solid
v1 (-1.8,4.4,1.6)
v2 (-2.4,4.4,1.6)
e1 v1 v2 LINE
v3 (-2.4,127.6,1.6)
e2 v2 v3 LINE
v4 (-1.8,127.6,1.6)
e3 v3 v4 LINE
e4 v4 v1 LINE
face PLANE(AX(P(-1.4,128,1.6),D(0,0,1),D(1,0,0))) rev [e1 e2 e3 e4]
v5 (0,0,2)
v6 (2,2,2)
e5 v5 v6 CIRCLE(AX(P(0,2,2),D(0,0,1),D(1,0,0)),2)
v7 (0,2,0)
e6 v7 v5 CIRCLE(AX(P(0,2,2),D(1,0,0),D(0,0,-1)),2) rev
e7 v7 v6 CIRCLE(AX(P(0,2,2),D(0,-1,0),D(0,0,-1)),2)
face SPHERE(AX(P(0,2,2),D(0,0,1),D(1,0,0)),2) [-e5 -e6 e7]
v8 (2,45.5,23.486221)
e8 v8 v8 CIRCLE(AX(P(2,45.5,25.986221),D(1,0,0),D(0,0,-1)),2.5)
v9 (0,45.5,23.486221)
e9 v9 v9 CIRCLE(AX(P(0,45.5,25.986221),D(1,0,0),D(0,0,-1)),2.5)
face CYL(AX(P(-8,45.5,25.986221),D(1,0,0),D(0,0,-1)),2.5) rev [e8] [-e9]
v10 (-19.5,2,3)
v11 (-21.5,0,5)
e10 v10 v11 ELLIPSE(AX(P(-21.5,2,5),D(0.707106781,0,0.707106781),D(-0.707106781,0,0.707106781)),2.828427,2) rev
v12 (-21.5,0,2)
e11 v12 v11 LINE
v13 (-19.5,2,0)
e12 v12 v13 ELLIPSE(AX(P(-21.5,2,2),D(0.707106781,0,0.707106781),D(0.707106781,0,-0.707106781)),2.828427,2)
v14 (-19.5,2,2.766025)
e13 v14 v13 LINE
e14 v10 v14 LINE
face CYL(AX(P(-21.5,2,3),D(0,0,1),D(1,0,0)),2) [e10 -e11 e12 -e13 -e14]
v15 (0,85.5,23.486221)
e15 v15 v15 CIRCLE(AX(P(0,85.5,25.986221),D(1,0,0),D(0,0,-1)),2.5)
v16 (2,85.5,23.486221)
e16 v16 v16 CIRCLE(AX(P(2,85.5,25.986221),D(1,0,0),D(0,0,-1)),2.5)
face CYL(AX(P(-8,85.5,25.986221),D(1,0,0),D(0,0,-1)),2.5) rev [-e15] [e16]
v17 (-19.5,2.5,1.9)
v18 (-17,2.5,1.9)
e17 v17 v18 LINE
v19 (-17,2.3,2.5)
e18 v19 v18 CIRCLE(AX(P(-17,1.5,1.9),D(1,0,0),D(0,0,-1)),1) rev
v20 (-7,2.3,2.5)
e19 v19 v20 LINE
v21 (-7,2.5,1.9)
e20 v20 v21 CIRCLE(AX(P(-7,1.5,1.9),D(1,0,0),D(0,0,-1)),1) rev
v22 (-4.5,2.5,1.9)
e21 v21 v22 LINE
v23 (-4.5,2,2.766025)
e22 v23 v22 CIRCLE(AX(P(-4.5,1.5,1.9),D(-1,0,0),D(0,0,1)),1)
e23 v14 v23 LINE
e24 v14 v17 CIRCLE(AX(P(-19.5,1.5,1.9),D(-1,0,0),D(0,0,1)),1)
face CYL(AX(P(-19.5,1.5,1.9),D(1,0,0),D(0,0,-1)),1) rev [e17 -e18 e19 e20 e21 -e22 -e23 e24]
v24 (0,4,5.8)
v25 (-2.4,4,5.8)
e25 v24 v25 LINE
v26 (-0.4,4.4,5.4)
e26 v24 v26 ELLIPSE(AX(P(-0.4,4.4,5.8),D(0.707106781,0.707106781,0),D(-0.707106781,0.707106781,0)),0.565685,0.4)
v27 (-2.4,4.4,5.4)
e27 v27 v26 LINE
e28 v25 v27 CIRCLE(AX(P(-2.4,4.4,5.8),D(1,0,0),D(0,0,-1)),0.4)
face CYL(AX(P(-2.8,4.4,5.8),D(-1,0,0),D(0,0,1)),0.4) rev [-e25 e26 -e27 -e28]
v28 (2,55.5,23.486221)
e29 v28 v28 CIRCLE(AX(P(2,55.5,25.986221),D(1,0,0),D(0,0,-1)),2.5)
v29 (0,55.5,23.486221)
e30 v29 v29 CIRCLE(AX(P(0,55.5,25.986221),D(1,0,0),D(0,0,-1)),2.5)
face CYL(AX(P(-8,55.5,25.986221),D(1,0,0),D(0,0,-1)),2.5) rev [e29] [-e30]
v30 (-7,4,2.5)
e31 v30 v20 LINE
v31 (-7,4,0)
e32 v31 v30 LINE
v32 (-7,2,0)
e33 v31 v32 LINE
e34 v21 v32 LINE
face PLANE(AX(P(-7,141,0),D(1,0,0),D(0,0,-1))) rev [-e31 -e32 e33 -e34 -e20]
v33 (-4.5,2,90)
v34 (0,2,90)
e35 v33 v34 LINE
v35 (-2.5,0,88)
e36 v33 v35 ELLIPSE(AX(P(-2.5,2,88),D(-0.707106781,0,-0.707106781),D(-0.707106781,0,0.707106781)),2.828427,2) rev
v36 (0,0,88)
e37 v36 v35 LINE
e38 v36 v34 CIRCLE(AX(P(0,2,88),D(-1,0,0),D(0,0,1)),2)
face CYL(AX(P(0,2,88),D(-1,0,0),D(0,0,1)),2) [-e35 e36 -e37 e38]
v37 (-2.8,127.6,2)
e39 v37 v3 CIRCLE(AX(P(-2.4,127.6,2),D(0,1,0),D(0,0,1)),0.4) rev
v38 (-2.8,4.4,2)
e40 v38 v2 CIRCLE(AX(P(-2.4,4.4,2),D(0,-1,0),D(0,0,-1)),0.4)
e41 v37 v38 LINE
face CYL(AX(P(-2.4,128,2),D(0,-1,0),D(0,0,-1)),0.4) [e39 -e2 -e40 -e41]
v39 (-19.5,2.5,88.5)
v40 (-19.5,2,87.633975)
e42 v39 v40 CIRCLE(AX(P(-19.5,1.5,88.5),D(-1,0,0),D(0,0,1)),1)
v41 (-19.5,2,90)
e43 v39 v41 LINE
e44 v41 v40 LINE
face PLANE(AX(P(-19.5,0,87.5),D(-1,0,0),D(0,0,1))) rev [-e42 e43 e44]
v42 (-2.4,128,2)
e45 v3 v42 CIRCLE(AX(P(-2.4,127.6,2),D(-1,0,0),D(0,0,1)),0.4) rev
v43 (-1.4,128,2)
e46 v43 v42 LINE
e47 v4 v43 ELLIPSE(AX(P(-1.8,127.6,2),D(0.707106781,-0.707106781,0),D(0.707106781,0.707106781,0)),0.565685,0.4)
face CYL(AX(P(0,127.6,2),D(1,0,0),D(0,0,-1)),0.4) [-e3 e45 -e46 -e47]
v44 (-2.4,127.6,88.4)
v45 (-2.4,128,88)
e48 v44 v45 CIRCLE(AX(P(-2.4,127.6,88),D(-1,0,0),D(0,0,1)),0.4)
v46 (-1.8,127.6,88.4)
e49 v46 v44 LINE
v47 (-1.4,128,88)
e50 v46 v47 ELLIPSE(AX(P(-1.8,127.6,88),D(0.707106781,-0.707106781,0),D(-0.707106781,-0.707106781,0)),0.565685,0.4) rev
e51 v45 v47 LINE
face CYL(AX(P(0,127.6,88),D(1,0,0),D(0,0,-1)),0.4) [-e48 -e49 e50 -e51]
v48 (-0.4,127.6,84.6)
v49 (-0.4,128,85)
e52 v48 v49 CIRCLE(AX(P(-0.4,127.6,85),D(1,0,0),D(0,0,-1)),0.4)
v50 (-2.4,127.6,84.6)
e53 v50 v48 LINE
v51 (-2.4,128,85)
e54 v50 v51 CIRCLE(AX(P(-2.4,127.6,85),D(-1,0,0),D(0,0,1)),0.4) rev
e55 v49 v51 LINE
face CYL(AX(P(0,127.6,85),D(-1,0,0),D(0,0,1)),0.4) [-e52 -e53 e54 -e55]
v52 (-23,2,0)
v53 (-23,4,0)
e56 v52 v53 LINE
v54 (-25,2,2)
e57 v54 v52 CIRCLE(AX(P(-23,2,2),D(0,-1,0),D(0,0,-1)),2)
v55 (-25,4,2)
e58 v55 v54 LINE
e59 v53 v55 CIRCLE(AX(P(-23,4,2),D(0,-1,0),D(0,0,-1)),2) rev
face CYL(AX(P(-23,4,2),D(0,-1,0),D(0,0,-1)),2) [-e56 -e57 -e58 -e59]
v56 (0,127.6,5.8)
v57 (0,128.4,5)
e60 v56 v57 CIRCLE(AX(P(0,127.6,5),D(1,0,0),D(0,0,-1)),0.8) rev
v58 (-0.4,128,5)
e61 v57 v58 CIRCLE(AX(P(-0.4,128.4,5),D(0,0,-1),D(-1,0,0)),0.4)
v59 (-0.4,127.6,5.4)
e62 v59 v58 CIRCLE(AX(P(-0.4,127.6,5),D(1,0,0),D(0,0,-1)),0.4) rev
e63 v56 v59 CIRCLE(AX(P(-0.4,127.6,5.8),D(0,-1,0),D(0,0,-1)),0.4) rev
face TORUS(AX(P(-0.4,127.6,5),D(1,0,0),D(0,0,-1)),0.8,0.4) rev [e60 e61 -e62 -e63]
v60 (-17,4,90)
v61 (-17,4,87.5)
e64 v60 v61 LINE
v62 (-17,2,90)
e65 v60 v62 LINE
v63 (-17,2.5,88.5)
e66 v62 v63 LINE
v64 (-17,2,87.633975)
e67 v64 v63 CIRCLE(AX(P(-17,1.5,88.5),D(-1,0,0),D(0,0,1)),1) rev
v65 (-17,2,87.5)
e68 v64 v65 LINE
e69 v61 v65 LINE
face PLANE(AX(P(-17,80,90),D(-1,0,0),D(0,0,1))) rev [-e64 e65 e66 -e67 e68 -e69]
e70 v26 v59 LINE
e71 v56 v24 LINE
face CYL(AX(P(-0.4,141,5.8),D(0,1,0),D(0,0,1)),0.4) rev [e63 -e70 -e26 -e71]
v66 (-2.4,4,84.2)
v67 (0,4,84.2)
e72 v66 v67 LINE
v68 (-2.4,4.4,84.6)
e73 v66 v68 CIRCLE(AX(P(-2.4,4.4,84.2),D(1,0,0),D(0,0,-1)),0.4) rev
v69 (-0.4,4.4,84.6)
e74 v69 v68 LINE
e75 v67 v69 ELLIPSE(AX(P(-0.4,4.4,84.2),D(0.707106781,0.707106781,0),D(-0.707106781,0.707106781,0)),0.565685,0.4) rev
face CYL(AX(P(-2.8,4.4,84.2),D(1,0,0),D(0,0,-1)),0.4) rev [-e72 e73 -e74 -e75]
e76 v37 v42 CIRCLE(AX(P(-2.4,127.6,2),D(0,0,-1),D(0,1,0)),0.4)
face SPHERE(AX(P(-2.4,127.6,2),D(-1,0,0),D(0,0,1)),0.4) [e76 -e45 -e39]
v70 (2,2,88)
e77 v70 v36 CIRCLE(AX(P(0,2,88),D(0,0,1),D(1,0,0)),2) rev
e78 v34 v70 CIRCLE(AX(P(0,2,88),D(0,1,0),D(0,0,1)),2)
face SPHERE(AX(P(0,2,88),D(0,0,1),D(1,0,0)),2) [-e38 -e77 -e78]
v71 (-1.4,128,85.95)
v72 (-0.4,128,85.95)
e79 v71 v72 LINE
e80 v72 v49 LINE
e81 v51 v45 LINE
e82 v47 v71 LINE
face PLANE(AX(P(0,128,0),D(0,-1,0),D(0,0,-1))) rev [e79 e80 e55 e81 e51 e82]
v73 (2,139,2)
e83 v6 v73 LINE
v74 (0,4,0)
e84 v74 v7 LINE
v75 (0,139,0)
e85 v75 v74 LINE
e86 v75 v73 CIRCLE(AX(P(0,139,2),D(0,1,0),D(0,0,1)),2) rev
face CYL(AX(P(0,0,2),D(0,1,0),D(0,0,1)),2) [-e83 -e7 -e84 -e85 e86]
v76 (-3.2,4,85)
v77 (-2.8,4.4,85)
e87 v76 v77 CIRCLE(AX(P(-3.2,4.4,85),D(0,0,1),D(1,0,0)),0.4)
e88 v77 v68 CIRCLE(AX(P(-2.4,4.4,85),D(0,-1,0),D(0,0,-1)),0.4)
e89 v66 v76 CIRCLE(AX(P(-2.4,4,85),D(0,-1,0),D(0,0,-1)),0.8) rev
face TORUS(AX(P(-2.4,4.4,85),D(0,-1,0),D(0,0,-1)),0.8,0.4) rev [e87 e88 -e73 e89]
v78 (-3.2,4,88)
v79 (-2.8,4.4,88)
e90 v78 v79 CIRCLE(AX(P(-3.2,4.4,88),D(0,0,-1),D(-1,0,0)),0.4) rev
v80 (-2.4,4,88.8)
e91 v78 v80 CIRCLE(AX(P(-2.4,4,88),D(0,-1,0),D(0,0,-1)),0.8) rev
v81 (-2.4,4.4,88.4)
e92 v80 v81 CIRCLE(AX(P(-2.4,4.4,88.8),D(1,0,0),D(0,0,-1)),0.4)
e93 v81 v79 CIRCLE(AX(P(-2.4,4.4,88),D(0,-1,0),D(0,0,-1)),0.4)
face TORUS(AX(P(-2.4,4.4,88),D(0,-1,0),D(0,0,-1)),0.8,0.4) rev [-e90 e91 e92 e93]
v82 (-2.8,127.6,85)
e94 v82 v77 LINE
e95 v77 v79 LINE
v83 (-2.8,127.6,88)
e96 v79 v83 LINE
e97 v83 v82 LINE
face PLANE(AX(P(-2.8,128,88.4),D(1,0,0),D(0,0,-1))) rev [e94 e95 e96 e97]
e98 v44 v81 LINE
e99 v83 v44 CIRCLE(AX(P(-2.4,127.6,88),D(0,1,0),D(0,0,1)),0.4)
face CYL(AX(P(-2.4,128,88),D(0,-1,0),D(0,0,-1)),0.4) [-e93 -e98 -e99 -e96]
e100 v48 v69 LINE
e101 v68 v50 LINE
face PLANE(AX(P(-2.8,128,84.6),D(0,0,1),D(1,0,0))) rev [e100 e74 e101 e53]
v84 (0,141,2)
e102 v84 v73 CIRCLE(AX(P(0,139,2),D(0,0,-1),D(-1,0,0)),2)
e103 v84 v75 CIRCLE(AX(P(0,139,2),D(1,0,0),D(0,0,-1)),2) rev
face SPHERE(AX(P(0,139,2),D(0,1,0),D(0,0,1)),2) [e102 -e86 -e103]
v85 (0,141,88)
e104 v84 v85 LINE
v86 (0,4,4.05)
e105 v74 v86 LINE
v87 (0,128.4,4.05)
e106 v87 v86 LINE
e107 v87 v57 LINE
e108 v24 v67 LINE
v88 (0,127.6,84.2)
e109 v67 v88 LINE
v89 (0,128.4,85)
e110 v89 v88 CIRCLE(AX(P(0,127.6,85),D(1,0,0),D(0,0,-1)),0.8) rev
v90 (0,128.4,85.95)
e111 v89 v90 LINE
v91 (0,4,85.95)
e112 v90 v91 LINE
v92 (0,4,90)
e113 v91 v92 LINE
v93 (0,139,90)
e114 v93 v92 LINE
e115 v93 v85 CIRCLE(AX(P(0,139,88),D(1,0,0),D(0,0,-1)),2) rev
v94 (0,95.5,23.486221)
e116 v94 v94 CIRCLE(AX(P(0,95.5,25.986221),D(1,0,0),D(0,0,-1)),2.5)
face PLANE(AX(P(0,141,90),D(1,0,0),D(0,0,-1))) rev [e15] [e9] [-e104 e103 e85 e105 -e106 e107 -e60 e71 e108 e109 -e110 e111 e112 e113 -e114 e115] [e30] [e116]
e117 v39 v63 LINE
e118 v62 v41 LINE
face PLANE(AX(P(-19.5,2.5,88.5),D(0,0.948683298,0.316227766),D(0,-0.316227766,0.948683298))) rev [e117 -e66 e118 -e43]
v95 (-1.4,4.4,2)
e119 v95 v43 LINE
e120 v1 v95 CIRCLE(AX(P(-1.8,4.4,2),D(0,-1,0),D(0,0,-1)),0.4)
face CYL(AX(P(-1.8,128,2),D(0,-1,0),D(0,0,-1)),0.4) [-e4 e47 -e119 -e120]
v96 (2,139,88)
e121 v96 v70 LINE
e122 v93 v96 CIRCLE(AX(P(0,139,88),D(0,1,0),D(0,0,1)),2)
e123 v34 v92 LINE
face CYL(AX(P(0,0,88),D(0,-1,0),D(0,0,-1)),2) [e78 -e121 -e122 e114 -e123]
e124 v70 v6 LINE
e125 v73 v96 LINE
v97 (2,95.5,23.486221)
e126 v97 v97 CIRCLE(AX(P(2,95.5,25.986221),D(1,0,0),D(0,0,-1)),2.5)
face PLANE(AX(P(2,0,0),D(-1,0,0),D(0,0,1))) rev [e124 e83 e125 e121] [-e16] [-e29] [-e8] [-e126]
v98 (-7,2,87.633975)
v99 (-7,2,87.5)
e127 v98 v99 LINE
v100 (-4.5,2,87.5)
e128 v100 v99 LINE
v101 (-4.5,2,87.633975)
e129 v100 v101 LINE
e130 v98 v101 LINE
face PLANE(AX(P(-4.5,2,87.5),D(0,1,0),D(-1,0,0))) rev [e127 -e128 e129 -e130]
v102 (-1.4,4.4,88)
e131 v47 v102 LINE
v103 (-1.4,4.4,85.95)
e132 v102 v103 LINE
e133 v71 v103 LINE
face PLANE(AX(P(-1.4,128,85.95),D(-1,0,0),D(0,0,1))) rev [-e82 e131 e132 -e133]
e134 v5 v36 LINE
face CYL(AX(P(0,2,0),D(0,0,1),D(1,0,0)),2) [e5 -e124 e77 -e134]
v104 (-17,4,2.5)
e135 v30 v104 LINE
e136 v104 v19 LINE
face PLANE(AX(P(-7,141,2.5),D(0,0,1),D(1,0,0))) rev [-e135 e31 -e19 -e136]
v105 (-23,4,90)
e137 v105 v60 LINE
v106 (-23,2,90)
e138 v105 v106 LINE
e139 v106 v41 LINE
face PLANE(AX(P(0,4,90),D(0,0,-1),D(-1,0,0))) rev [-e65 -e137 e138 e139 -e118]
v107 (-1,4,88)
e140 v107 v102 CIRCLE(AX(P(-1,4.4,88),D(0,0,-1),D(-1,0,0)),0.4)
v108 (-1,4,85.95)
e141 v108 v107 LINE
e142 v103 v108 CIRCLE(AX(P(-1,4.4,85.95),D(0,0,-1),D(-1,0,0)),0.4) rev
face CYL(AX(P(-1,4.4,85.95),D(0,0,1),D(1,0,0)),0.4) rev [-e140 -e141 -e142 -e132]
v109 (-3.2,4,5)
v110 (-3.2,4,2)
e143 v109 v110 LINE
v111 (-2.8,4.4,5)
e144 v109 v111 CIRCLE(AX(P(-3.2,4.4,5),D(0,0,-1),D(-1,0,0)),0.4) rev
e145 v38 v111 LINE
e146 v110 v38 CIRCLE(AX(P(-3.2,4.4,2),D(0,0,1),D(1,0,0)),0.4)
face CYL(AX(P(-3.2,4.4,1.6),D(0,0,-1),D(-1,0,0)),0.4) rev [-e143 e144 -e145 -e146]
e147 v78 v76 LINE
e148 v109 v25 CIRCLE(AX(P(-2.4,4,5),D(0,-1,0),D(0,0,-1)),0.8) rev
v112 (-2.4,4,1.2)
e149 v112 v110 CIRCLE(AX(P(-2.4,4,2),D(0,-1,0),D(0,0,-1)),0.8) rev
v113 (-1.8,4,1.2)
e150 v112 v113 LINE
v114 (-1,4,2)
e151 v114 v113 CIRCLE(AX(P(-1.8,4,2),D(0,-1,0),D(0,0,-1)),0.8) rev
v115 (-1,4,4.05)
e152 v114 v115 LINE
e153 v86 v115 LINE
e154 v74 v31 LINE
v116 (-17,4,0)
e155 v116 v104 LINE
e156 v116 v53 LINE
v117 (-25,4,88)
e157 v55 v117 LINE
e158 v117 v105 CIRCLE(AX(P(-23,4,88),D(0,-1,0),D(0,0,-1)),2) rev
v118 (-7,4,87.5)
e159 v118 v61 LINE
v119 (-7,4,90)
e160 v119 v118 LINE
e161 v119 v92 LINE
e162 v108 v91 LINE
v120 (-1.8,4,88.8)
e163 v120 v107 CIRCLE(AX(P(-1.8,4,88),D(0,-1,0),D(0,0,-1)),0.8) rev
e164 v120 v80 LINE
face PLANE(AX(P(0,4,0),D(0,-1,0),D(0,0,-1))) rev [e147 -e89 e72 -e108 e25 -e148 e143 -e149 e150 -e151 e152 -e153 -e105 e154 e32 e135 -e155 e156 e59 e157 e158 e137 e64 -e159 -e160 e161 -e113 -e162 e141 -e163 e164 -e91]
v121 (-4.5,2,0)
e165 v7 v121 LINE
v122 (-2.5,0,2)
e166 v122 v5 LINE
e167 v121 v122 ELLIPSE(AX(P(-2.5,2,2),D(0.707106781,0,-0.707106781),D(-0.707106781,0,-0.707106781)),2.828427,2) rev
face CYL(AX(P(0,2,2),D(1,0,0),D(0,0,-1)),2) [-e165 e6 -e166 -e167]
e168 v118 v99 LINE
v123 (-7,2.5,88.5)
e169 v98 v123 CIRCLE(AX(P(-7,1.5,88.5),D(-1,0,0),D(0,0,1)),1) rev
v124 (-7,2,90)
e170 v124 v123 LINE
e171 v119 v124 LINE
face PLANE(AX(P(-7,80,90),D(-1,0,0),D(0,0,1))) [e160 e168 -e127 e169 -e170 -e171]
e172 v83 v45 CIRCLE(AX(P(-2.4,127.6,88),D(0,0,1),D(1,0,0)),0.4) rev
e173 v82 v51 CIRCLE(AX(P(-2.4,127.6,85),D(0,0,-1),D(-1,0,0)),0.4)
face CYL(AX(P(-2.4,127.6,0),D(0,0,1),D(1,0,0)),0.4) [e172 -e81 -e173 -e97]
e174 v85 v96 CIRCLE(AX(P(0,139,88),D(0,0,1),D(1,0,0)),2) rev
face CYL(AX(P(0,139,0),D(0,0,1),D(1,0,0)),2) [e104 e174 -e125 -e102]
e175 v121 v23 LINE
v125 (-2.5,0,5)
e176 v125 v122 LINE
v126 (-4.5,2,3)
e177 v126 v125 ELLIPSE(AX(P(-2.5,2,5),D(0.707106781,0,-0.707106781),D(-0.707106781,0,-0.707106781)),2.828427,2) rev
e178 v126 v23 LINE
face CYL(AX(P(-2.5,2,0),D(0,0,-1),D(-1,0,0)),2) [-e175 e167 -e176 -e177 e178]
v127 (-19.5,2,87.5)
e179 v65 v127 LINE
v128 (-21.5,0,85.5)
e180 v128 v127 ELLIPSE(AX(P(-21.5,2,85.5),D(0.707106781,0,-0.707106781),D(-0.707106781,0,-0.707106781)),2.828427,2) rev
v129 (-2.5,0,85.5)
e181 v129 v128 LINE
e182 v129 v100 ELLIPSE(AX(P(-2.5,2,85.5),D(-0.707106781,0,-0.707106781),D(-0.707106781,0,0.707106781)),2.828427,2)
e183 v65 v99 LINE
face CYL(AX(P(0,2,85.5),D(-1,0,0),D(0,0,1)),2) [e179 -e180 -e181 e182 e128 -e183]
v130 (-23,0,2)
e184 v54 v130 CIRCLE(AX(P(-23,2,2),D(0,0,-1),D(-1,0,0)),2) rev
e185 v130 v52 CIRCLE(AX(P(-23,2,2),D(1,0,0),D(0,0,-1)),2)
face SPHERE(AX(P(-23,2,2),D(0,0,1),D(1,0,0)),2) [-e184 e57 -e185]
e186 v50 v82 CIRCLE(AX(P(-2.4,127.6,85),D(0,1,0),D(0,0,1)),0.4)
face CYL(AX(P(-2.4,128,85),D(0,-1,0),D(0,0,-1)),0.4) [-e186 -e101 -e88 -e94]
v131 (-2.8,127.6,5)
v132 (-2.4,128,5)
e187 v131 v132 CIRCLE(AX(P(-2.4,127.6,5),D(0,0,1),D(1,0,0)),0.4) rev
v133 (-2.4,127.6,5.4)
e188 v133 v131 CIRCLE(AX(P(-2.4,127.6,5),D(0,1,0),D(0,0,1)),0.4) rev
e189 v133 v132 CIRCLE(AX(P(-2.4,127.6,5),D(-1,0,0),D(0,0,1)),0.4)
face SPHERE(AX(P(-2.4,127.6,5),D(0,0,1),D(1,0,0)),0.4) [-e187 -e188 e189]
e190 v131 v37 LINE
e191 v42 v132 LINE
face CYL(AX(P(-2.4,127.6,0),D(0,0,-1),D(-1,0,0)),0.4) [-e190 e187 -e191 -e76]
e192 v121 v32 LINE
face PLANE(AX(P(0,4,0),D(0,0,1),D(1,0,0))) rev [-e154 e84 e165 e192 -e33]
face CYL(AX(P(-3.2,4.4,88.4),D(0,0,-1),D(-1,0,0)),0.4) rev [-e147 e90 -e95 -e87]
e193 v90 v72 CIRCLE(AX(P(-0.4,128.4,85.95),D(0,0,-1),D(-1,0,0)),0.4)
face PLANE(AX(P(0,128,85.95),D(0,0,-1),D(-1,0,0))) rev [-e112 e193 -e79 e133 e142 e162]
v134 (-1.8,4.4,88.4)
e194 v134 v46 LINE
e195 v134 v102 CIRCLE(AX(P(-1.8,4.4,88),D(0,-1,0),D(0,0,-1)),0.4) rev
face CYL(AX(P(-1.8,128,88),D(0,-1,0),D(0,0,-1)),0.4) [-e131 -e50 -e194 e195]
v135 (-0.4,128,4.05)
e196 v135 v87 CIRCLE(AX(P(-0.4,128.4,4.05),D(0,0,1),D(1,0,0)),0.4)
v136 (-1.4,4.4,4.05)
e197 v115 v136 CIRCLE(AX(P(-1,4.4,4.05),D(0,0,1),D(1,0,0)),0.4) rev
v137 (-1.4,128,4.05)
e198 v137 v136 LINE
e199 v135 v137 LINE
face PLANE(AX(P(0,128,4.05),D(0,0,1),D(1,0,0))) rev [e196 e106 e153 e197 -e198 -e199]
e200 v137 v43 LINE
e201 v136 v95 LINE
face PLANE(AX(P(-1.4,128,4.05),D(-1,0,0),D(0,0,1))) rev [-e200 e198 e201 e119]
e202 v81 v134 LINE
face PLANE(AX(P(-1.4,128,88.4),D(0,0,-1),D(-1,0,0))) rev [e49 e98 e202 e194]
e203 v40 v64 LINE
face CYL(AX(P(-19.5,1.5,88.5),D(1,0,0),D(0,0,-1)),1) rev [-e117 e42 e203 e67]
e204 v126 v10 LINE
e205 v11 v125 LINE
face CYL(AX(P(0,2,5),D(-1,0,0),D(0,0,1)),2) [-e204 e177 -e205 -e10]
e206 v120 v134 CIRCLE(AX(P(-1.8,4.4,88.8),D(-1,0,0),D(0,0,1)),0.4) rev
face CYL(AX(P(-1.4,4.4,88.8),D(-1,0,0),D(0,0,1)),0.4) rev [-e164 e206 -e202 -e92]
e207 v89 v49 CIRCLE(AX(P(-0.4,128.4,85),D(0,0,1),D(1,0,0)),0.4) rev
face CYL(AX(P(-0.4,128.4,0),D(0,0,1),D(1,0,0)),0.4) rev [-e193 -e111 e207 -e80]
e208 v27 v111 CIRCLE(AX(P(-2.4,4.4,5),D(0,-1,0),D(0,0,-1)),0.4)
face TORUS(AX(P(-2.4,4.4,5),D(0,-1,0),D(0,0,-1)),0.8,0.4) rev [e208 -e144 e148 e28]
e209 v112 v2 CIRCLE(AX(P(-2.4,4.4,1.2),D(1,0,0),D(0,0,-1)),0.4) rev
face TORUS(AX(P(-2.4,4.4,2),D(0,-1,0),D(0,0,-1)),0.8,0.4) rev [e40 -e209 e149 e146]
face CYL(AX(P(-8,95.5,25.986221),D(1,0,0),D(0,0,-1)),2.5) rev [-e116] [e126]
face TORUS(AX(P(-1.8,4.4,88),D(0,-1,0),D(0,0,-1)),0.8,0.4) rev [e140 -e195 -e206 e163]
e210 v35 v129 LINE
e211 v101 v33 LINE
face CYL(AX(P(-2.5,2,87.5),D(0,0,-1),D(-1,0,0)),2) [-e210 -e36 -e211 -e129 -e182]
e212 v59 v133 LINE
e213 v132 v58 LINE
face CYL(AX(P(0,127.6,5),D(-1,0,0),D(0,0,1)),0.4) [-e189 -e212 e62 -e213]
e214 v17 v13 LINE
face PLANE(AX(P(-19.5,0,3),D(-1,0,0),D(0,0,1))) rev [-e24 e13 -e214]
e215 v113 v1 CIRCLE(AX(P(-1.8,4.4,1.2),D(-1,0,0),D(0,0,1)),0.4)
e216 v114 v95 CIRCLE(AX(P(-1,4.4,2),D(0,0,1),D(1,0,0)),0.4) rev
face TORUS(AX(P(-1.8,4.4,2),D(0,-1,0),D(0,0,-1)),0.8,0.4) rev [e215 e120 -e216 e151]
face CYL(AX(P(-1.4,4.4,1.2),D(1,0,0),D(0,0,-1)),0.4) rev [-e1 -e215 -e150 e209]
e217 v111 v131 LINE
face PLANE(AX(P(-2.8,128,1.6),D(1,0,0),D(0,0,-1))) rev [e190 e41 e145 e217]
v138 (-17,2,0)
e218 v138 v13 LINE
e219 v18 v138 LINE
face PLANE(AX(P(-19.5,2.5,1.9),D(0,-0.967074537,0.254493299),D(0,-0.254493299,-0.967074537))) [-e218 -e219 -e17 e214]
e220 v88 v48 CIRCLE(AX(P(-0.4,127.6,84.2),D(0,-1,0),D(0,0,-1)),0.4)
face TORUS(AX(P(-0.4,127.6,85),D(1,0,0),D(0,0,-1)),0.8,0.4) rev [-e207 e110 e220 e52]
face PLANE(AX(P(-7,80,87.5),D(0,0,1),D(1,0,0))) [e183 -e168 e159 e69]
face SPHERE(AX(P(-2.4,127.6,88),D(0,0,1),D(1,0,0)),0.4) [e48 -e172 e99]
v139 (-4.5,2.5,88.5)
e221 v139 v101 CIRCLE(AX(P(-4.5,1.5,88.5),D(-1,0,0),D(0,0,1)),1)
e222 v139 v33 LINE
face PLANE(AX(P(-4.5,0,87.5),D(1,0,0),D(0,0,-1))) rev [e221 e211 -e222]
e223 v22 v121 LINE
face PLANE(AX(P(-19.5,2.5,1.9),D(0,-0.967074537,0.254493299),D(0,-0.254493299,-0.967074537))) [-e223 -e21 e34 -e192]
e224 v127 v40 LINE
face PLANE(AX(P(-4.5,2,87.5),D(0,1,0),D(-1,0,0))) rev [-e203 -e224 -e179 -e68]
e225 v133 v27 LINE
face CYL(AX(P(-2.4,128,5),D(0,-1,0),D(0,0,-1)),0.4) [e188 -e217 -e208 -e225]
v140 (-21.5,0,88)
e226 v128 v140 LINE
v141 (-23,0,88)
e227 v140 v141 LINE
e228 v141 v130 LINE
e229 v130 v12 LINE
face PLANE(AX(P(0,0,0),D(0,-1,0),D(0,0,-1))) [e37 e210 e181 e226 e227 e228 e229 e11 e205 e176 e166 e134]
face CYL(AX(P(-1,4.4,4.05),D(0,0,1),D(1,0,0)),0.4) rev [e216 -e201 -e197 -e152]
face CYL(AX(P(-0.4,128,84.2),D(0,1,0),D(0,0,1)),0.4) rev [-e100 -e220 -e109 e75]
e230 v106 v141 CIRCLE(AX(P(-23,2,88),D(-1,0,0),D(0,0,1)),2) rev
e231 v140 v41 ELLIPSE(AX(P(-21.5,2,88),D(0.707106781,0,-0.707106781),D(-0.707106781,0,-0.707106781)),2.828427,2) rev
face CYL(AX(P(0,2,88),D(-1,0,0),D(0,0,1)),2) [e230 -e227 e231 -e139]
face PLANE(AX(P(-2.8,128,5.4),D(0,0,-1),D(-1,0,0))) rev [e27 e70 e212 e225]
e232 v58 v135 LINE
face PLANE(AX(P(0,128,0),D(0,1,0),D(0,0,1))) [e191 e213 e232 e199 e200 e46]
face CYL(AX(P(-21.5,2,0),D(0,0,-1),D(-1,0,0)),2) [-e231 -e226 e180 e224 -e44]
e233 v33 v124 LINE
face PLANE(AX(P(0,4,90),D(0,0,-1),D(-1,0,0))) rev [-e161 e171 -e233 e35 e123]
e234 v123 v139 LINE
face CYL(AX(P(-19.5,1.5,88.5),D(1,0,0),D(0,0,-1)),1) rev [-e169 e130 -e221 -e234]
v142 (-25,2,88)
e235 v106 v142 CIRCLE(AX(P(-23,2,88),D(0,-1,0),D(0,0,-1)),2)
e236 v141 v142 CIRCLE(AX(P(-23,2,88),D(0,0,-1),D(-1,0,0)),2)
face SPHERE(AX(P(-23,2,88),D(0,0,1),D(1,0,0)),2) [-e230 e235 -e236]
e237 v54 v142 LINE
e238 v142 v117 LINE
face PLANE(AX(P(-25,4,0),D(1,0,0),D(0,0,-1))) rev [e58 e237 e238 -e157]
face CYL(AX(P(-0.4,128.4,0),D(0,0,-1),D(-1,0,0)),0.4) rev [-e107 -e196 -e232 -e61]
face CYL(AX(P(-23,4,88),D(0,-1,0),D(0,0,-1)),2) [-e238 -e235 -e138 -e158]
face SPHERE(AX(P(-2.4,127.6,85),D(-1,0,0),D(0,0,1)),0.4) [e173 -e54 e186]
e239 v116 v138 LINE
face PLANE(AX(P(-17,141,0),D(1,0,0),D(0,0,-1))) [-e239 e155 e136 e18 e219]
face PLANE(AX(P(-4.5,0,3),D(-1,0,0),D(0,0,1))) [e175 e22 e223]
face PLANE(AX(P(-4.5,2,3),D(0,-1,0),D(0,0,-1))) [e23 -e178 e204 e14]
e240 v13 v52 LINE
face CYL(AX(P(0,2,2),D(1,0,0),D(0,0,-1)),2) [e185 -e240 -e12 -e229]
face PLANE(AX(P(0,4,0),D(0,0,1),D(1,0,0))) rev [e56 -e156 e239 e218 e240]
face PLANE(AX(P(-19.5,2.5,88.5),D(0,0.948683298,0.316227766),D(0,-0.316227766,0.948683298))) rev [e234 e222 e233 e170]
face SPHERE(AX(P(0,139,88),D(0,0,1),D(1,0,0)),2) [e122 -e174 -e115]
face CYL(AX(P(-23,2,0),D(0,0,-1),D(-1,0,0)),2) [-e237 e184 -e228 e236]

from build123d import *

# Parameters (mm, degrees)
SKETCH1_W           = 25
SKETCH1_H           = 90
BOSS_EXTRUDE1_DEPTH = 4
SKETCH3_W           = 90
SKETCH3_H           = 4
BOSS_EXTRUDE2_DEPTH = 2
SKETCH4_W           = 2
SKETCH4_H           = 90
BOSS_EXTRUDE3_DEPTH = 137
SKETCH6_W           = 10
SKETCH6_H           = 2.5
CUT_EXTRUDE1_DEPTH  = 170.133083694
SKETCH6_3_W         = 10
SKETCH6_3_H         = 2.5
CUT_EXTRUDE2_DEPTH  = 80
SKETCH8_W           = 15
SKETCH8_H           = 2
CUT_EXTRUDE3_DEPTH  = 2.5
CUT_EXTRUDE5_DEPTH  = 15
SKETCH11_W          = 15
SKETCH11_H          = 2
CUT_EXTRUDE6_DEPTH  = 3
CUT_EXTRUDE7_DEPTH  = 15
FILLET6_R           = 2
FILLET7_R           = 2
BOSS_EXTRUDE4_DEPTH = 124
FILLET8_R           = 0.4
FILLET9_R           = 2
SKETCH16_R          = 2.5
CUT_EXTRUDE8_DEPTH  = 10


# Some blends are built 0.0001 mm under size
with BuildPart() as part:
    # Sketch1 → Boss-Extrude1 (new body)
    with BuildSketch(Plane(origin=(0, 0, 0), x_dir=(1, 0, 0), z_dir=(0, 1, 0))):
        with Locations((-12.5, -45)):
            Rectangle(SKETCH1_W, SKETCH1_H)
    extrude(amount=BOSS_EXTRUDE1_DEPTH)

    # Sketch3 → Boss-Extrude2 (add)
    with BuildSketch(Plane(origin=(0, 0, 0), x_dir=(0, 0, -1), z_dir=(1, 0, 0))):
        with Locations((-45, 2)):
            Rectangle(SKETCH3_W, SKETCH3_H)
    extrude(amount=BOSS_EXTRUDE2_DEPTH)

    # Sketch4 → Boss-Extrude3 (add)
    with BuildSketch(Plane(origin=(0, 4, 0), x_dir=(1, 0, 0), z_dir=(0, 1, 0))):
        with Locations((1, -45)):
            Rectangle(SKETCH4_W, SKETCH4_H)
    extrude(amount=BOSS_EXTRUDE3_DEPTH)

    # Sketch6 → Cut-Extrude1 (cut, through all)
    with BuildSketch(Plane.XZ):
        with Locations((-12, 1.25)):
            Rectangle(SKETCH6_W, SKETCH6_H)
    extrude(amount=-CUT_EXTRUDE1_DEPTH, mode=Mode.SUBTRACT)

    # Sketch6<3> → Cut-Extrude2 (cut)
    with BuildSketch(Plane.XZ):
        with Locations((-12, 88.75)):
            Rectangle(SKETCH6_3_W, SKETCH6_3_H)
    extrude(amount=-CUT_EXTRUDE2_DEPTH, mode=Mode.SUBTRACT)

    # Sketch8 → Cut-Extrude3 (cut)
    with BuildSketch(Plane.XY.offset(90)):
        with Locations((-12, 1)):
            Rectangle(SKETCH8_W, SKETCH8_H)
    extrude(amount=-CUT_EXTRUDE3_DEPTH, mode=Mode.SUBTRACT)

    # Sketch9 → Cut-Extrude5 (cut)
    with BuildSketch(Plane.ZY.offset(4.5)):
        with BuildLine():
            ThreePointArc((88.5, 2.5), (88, 2.366025404), (87.633974596, 2))
            Line((87.633974596, 2), (90, 2))
            Line((90, 2), (88.5, 2.5))
        make_face()
    extrude(amount=CUT_EXTRUDE5_DEPTH, mode=Mode.SUBTRACT)

    # Sketch11 → Cut-Extrude6 (cut)
    with BuildSketch(Plane(origin=(0, 0, 0), x_dir=(-1, 0, 0), z_dir=(0, 0, -1))):
        with Locations((12, 1)):
            Rectangle(SKETCH11_W, SKETCH11_H)
    extrude(amount=-CUT_EXTRUDE6_DEPTH, mode=Mode.SUBTRACT)

    # Sketch12 → Cut-Extrude7 (cut)
    with BuildSketch(Plane.ZY.offset(4.5)):
        with BuildLine():
            ThreePointArc((2.766025404, 2), (2.4, 2.366025404), (1.9, 2.5))
            Line((1.9, 2.5), (0, 2))
            Line((0, 2), (2.766025404, 2))
        make_face()
    extrude(amount=CUT_EXTRUDE7_DEPTH, mode=Mode.SUBTRACT)

    # Fillet6
    fillet6_edges = [part.edges().sort_by_distance(p)[0] for p in [
        (-22.25, 0, 0),
        (-12, 0, 3),
        (-19.5, 0, 1.5),
        (-4.5, 0, 1.5),
        (2, 0, 45),
        (-22.25, 0, 90),
        (-25, 0, 45),
        (-1.25, 0, 0),
        (-12, 0, 87.5),
        (-1.25, 0, 90),
        (-4.5, 0, 88.75),
        (-19.5, 0, 88.75),
    ]]
    fillet(fillet6_edges, radius=FILLET6_R - 0.0001)  # a hair under: the kernel refuses the full size

    # Fillet7
    # the kernel refuses this fillet: 2 mm, written as the material it takes off along each edge
    with BuildSketch(Plane(origin=(-23, 0, 88), x_dir=(0, 0, 1), z_dir=(1, 0, 0))) as fillet7_piece_1:
        with BuildLine():
            CenterArc((0.0001, -1.9999), 1.9999, 0, 90)
            Line((2, -1.9999), (2, 0))
            Line((2, 0), (0.0001, 0))
        make_face()
    revolve(axis=Axis((-23, 0, 88), (0, -1, 0)), revolution_arc=90, mode=Mode.SUBTRACT)
    with BuildSketch(Plane(origin=(-23, 0, 2), x_dir=(-1, 0, 0), z_dir=(0, 0, 1))) as fillet7_piece_2:
        with BuildLine():
            CenterArc((0.0001, -1.9999), 1.9999, 0, 90)
            Line((2, -1.9999), (2, 0))
            Line((2, 0), (0.0001, 0))
        make_face()
    revolve(axis=Axis((-23, 0, 2), (0, -1, 0)), revolution_arc=90, mode=Mode.SUBTRACT)
    with BuildSketch(Plane(origin=(-25, 0, 90), x_dir=(0, 0, -1), z_dir=(0, 1, 0)), Plane(origin=(-25, 0, 0), x_dir=(1, 0, 0), z_dir=(0, 1, 0))) as fillet7_piece_3:
        with BuildLine():
            CenterArc((FILLET7_R, -FILLET7_R), FILLET7_R, 90, 90)
            Line((0, -FILLET7_R), (0, 0))
            Line((0, 0), (FILLET7_R, 0))
        make_face()
    extrude(amount=9, mode=Mode.SUBTRACT)

    # Sketch13 → Boss-Extrude4 (add)
    with BuildSketch(Plane(origin=(0, 4, 0), x_dir=(1, 0, 0), z_dir=(0, 1, 0))):
        Polygon((0, -4.05), (-1.4, -4.05), (-1.4, -1.6), (-2.8, -1.6), (-2.8, -5.4), (0, -5.4), align=None)
        Polygon((-1.4, -88.4), (-2.8, -88.4), (-2.8, -84.6), (0, -84.6), (0, -85.95), (-1.4, -85.95), align=None)
    extrude(amount=BOSS_EXTRUDE4_DEPTH)

    # Fillet8
    fillet8_edges = [part.edges().sort_by_distance(p)[0] for p in [
        (0, 66, 5.4),
        (-1.4, 4, 2.825),
        (-2.1, 4, 1.6),
        (-1.4, 66, 1.6),
        (-2.8, 4, 3.5),
        (-2.8, 66, 1.6),
        (-1.4, 4, 5.4),
        (-2.8, 66, 5.4),
        (0, 128, 4.725),
        (-2.1, 128, 1.6),
        (-2.8, 128, 3.5),
        (-1.4, 128, 5.4),
        (-1.4, 4, 87.175),
        (-1.4, 66, 88.4),
        (-1.4, 4, 84.6),
        (0, 66, 84.6),
        (-2.8, 4, 86.5),
        (-2.8, 66, 84.6),
        (-2.1, 4, 88.4),
        (-2.8, 66, 88.4),
        (0, 128, 85.275),
        (-1.4, 128, 84.6),
        (-2.8, 128, 86.5),
        (-2.1, 128, 88.4),
    ]]
    fillet(fillet8_edges, radius=FILLET8_R)

    # Fillet9
    # the kernel refuses this fillet: 2 mm, written as the material it takes off along each edge
    with BuildSketch(Plane(origin=(0, 0, 88), x_dir=(1, 0, 0), z_dir=(0, 0, -1))) as fillet9_piece_1:
        with BuildLine():
            CenterArc((0.0001, -1.9999), 1.9999, 0, 90)
            Line((2, -1.9999), (2, 0))
            Line((2, 0), (0.0001, 0))
        make_face()
    revolve(axis=Axis((0, 0, 88), (0, -1, 0)), revolution_arc=90, mode=Mode.SUBTRACT)
    with BuildSketch(Plane(origin=(0, 0, 2), x_dir=(0, 0, -1), z_dir=(-1, 0, 0))) as fillet9_piece_2:
        with BuildLine():
            CenterArc((0.0001, -1.9999), 1.9999, 0, 90)
            Line((2, -1.9999), (2, 0))
            Line((2, 0), (0.0001, 0))
        make_face()
    revolve(axis=Axis((0, 0, 2), (0, -1, 0)), revolution_arc=90, mode=Mode.SUBTRACT)
    with BuildSketch(Plane(origin=(0, 139, 88), x_dir=(0, 0, 1), z_dir=(1, 0, 0))) as fillet9_piece_3_section:
        Polygon((0, 0), (FILLET9_R, 0), (FILLET9_R, -FILLET9_R), (0, -FILLET9_R), align=None)
    fillet9_piece_3 = extrude(amount=FILLET9_R, mode=Mode.PRIVATE)
    fillet9_piece_3 = fillet9_piece_3 - Plane(origin=(0, 139, 88), x_dir=(0, -0.7071067811865475, -0.7071067811865475), z_dir=(1, 0, 0)) * Sphere(FILLET9_R, mode=Mode.PRIVATE)
    add(fillet9_piece_3, mode=Mode.SUBTRACT)
    with BuildSketch(Plane(origin=(0, 139, 2), x_dir=(0, 0, -1), z_dir=(0, 1, 0))) as fillet9_piece_4_section:
        Polygon((0, 0), (FILLET9_R, 0), (FILLET9_R, -FILLET9_R), (0, -FILLET9_R), align=None)
    fillet9_piece_4 = extrude(amount=FILLET9_R, mode=Mode.PRIVATE)
    fillet9_piece_4 = fillet9_piece_4 - Plane(origin=(0, 139, 2), x_dir=(-0.7071067811865474, 0, 0.7071067811865476), z_dir=(0, 1, 0)) * Sphere(FILLET9_R, mode=Mode.PRIVATE)
    add(fillet9_piece_4, mode=Mode.SUBTRACT)
    with BuildSketch(Plane(origin=(2, 139, 90), x_dir=(-1, 0, 0), z_dir=(0, -1, 0)), Plane(origin=(2, 139, 0), x_dir=(0, 0, 1), z_dir=(0, -1, 0))) as fillet9_piece_5:
        with BuildLine():
            CenterArc((FILLET9_R, FILLET9_R), FILLET9_R, 180, 90)
            Line((0, FILLET9_R), (0, 0))
            Line((0, 0), (FILLET9_R, 0))
        make_face()
    extrude(amount=139, mode=Mode.SUBTRACT)
    with BuildSketch(Plane(origin=(2, 141, 2), x_dir=(-1, 0, 0), z_dir=(0, 0, 1))) as fillet9_piece_6:
        with BuildLine():
            CenterArc((FILLET9_R, FILLET9_R), FILLET9_R, 180, 90)
            Line((0, FILLET9_R), (0, 0))
            Line((0, 0), (FILLET9_R, 0))
        make_face()
    extrude(amount=86, mode=Mode.SUBTRACT)
    with BuildSketch(Plane(origin=(-5, 141, 0), x_dir=(0, 0, 1), z_dir=(1, 0, 0))) as fillet9_piece_7:
        with BuildLine():
            CenterArc((FILLET9_R, FILLET9_R), FILLET9_R, 180, 90)
            Line((0, FILLET9_R), (0, 0))
            Line((0, 0), (FILLET9_R, 0))
        make_face()
    extrude(amount=5, mode=Mode.SUBTRACT)
    with BuildSketch(Plane(origin=(0, 141, 90), x_dir=(0, -1, 0), z_dir=(-1, 0, 0))) as fillet9_piece_8:
        with BuildLine():
            CenterArc((FILLET9_R, -FILLET9_R), FILLET9_R, 90, 90)
            Line((0, -FILLET9_R), (0, 0))
            Line((0, 0), (FILLET9_R, 0))
        make_face()
    extrude(amount=5, mode=Mode.SUBTRACT)

    # Sketch16 → Cut-Extrude8 (cut)
    with BuildSketch(Plane(origin=(2, 0, 0), x_dir=(0, 0, -1), z_dir=(1, 0, 0))):
        with Locations((-25.986220839, 95.5)):
            Circle(SKETCH16_R)
        with Locations((-25.986220839, 85.5)):
            Circle(SKETCH16_R)
        with Locations((-25.986220839, 55.5)):
            Circle(SKETCH16_R)
        with Locations((-25.986220839, 45.5)):
            Circle(SKETCH16_R)
    extrude(amount=-CUT_EXTRUDE8_DEPTH, mode=Mode.SUBTRACT)


solid = part.part
